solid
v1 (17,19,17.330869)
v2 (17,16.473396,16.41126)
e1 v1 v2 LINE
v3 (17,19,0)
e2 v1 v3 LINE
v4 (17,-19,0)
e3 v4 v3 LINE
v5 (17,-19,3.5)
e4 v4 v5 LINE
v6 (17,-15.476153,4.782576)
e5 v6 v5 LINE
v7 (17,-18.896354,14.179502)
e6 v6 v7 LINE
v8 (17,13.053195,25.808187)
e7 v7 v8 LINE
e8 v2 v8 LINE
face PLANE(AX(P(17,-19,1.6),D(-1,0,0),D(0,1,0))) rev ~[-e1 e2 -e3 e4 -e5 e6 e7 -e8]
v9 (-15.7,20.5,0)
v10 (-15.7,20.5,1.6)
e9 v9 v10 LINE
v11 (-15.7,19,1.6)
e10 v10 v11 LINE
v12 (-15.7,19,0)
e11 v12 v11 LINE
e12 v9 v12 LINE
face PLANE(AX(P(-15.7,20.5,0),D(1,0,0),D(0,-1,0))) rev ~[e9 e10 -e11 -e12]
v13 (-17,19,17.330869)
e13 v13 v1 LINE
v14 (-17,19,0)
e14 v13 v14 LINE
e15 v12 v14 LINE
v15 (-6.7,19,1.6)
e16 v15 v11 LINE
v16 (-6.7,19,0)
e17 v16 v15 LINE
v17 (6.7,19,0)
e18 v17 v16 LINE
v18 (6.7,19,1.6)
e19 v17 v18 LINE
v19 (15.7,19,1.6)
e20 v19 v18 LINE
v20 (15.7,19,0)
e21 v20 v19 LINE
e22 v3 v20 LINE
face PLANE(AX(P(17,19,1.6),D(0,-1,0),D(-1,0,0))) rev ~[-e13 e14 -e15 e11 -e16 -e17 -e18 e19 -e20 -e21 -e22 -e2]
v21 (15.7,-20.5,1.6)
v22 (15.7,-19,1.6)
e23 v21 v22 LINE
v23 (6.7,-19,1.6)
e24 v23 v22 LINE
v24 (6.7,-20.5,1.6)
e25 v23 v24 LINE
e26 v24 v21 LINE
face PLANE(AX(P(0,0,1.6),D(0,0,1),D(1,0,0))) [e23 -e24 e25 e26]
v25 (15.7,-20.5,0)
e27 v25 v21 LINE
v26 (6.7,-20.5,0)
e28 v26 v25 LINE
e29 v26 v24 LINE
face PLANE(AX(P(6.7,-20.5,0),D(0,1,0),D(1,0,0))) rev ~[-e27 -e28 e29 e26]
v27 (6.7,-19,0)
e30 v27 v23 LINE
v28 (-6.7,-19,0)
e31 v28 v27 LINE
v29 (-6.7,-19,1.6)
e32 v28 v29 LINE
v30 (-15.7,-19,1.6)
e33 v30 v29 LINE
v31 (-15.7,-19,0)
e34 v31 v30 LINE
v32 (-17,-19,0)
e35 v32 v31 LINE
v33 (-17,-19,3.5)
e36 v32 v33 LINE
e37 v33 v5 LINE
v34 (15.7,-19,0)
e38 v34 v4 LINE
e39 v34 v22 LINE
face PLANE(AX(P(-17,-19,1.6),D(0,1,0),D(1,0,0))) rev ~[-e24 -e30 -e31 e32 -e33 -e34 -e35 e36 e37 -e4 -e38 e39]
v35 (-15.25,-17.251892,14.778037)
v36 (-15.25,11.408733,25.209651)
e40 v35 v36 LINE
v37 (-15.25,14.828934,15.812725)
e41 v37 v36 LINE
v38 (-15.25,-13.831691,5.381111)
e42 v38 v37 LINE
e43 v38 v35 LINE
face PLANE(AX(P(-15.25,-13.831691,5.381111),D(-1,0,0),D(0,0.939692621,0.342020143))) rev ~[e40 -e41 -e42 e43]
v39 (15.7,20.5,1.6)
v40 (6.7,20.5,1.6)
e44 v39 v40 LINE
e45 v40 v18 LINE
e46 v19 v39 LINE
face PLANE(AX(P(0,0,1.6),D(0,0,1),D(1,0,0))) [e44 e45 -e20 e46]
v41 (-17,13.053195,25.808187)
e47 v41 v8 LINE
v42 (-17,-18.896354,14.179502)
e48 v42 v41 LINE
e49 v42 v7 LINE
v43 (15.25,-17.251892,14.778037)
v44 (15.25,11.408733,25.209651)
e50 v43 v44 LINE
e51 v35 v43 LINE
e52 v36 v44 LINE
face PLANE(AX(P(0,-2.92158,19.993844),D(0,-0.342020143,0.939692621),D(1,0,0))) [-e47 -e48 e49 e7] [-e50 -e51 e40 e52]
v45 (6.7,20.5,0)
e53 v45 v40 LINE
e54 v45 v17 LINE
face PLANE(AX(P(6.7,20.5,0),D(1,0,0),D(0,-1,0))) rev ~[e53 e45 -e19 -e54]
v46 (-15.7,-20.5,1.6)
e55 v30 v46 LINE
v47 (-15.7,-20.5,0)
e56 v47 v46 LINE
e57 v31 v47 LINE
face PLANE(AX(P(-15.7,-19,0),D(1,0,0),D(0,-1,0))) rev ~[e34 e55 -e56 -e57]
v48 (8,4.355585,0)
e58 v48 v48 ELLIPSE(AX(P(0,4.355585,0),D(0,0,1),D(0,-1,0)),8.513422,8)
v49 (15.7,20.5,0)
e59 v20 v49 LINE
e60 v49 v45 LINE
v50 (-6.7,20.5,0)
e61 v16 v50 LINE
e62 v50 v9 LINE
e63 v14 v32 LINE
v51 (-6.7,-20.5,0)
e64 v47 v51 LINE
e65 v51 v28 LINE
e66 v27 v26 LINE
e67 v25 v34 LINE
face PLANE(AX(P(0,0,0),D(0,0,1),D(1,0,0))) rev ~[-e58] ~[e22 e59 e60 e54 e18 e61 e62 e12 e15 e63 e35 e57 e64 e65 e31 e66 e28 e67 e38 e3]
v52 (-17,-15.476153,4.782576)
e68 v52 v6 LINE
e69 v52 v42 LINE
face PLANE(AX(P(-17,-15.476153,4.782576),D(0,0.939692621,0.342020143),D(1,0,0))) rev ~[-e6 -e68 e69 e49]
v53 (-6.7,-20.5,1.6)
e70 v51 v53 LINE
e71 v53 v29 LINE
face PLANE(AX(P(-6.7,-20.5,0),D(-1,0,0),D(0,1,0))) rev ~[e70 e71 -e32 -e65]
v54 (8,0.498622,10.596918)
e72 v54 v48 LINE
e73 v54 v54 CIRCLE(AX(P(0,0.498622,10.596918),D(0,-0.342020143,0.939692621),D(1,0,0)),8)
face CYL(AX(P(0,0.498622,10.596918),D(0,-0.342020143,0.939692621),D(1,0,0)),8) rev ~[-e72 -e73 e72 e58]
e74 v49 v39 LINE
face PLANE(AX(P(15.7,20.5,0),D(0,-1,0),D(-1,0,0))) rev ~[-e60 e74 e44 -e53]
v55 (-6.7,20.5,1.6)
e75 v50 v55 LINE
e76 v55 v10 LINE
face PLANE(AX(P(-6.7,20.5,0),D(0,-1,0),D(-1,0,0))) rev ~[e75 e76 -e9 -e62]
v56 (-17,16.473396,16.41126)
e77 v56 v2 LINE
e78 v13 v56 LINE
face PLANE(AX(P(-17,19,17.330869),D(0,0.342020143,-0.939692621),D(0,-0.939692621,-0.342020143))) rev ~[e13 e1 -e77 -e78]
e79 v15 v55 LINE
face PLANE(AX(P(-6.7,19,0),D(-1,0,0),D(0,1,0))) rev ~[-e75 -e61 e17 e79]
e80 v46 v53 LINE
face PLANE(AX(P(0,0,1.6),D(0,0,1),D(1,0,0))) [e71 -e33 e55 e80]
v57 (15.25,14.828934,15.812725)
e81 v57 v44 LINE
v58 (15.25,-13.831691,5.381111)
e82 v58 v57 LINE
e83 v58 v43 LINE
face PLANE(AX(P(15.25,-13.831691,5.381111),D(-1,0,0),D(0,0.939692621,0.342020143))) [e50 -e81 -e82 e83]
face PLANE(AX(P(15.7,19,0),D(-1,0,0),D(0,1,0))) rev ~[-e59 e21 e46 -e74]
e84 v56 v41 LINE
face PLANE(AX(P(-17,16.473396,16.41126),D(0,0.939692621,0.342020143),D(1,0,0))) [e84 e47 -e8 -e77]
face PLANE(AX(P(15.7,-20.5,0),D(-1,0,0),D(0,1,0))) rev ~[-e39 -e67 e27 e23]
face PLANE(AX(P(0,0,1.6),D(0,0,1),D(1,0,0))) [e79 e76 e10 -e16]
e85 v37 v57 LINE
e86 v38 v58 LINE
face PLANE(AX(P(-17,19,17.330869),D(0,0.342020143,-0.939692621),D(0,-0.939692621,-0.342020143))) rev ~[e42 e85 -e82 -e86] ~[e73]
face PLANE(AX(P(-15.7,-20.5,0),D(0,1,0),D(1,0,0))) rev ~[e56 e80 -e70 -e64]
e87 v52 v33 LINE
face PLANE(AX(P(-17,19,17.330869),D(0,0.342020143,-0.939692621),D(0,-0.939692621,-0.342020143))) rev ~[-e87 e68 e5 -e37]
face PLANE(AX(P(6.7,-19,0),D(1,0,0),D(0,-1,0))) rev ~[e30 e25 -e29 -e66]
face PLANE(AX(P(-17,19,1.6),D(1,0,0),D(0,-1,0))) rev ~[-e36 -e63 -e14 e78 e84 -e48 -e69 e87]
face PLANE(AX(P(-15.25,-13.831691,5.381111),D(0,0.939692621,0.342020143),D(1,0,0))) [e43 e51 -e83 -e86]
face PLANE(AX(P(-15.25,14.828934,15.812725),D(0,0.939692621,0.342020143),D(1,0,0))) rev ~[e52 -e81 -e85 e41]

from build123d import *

# Parameters (mm, degrees)
F1_DEPTH = 1.6
F3_DEPTH = 20
F5_DEPTH = 34.001
F6_W     = 34
F6_H     = 34
F6_W_2   = 30.5
F6_H_2   = 30.5
F7_DEPTH = 10
F6_R     = 8
F8_DEPTH = 16.7997198341


# Not quite as in the source:
# - a feature names something its author has since deleted; it is built from what else it names


with BuildPart() as f1:
    # F0 (on Top) → F1 (new body)
    with BuildSketch(Plane.XY):
        Polygon((-15.7, 19), (-17, 19), (-17, -19), (-15.7, -19), (-15.7, -20.5), (-6.7, -20.5), (-6.7, -19), (6.7, -19), (6.7, -20.5), (15.7, -20.5), (15.7, -19), (17, -19), (17, 19), (15.7, 19), (15.7, 20.5), (6.7, 20.5), (6.7, 19), (-6.7, 19), (-6.7, 20.5), (-15.7, 20.5), align=None)
    extrude(amount=F1_DEPTH)

    # F2 (on face) → F3 (join)
    with BuildSketch(Plane.XY.offset(1.6)):
        Polygon((-15.7, 19), (-17, 19), (-17, -19), (-15.7, -19), (-6.7, -19), (6.7, -19), (15.7, -19), (17, -19), (17, 19), (15.7, 19), (6.7, 19), (-6.7, 19), align=None)
    extrude(amount=F3_DEPTH)

    # F4 (on face) → F5 (cut, through all)
    with BuildSketch(Plane(origin=(-17, 0, 0), x_dir=(0, -1, 0), z_dir=(-1, 0, 0))):
        Polygon((-19, 17.3308689021), (19, 3.5), (19, 21.6), (-19, 21.6), align=None)
    extrude(amount=-F5_DEPTH, mode=Mode.SUBTRACT)

    # F6 (on face) → F7 (join)
    with BuildSketch(Plane(origin=(0, -3.3474561073, 9.1970600675), x_dir=(1, 0, 0), z_dir=(0, -0.3420201433, 0.9396926208))):
        with Locations((0, 4.0929107067)):
            Rectangle(F6_W, F6_H)
        with Locations((0, 4.0929107067)):
            Rectangle(F6_W_2, F6_H_2, mode=Mode.SUBTRACT)
    extrude(amount=F7_DEPTH)

    # F6 (on face) → F8 (cut, through all)
    with BuildSketch(Plane(origin=(0, -3.3474561073, 9.1970600675), x_dir=(1, 0, 0), z_dir=(0, -0.3420201433, 0.9396926208))):
        with Locations((0, 4.0929107067)):
            Circle(F6_R)
    extrude(amount=-F8_DEPTH, mode=Mode.SUBTRACT)


solid = f1.part
